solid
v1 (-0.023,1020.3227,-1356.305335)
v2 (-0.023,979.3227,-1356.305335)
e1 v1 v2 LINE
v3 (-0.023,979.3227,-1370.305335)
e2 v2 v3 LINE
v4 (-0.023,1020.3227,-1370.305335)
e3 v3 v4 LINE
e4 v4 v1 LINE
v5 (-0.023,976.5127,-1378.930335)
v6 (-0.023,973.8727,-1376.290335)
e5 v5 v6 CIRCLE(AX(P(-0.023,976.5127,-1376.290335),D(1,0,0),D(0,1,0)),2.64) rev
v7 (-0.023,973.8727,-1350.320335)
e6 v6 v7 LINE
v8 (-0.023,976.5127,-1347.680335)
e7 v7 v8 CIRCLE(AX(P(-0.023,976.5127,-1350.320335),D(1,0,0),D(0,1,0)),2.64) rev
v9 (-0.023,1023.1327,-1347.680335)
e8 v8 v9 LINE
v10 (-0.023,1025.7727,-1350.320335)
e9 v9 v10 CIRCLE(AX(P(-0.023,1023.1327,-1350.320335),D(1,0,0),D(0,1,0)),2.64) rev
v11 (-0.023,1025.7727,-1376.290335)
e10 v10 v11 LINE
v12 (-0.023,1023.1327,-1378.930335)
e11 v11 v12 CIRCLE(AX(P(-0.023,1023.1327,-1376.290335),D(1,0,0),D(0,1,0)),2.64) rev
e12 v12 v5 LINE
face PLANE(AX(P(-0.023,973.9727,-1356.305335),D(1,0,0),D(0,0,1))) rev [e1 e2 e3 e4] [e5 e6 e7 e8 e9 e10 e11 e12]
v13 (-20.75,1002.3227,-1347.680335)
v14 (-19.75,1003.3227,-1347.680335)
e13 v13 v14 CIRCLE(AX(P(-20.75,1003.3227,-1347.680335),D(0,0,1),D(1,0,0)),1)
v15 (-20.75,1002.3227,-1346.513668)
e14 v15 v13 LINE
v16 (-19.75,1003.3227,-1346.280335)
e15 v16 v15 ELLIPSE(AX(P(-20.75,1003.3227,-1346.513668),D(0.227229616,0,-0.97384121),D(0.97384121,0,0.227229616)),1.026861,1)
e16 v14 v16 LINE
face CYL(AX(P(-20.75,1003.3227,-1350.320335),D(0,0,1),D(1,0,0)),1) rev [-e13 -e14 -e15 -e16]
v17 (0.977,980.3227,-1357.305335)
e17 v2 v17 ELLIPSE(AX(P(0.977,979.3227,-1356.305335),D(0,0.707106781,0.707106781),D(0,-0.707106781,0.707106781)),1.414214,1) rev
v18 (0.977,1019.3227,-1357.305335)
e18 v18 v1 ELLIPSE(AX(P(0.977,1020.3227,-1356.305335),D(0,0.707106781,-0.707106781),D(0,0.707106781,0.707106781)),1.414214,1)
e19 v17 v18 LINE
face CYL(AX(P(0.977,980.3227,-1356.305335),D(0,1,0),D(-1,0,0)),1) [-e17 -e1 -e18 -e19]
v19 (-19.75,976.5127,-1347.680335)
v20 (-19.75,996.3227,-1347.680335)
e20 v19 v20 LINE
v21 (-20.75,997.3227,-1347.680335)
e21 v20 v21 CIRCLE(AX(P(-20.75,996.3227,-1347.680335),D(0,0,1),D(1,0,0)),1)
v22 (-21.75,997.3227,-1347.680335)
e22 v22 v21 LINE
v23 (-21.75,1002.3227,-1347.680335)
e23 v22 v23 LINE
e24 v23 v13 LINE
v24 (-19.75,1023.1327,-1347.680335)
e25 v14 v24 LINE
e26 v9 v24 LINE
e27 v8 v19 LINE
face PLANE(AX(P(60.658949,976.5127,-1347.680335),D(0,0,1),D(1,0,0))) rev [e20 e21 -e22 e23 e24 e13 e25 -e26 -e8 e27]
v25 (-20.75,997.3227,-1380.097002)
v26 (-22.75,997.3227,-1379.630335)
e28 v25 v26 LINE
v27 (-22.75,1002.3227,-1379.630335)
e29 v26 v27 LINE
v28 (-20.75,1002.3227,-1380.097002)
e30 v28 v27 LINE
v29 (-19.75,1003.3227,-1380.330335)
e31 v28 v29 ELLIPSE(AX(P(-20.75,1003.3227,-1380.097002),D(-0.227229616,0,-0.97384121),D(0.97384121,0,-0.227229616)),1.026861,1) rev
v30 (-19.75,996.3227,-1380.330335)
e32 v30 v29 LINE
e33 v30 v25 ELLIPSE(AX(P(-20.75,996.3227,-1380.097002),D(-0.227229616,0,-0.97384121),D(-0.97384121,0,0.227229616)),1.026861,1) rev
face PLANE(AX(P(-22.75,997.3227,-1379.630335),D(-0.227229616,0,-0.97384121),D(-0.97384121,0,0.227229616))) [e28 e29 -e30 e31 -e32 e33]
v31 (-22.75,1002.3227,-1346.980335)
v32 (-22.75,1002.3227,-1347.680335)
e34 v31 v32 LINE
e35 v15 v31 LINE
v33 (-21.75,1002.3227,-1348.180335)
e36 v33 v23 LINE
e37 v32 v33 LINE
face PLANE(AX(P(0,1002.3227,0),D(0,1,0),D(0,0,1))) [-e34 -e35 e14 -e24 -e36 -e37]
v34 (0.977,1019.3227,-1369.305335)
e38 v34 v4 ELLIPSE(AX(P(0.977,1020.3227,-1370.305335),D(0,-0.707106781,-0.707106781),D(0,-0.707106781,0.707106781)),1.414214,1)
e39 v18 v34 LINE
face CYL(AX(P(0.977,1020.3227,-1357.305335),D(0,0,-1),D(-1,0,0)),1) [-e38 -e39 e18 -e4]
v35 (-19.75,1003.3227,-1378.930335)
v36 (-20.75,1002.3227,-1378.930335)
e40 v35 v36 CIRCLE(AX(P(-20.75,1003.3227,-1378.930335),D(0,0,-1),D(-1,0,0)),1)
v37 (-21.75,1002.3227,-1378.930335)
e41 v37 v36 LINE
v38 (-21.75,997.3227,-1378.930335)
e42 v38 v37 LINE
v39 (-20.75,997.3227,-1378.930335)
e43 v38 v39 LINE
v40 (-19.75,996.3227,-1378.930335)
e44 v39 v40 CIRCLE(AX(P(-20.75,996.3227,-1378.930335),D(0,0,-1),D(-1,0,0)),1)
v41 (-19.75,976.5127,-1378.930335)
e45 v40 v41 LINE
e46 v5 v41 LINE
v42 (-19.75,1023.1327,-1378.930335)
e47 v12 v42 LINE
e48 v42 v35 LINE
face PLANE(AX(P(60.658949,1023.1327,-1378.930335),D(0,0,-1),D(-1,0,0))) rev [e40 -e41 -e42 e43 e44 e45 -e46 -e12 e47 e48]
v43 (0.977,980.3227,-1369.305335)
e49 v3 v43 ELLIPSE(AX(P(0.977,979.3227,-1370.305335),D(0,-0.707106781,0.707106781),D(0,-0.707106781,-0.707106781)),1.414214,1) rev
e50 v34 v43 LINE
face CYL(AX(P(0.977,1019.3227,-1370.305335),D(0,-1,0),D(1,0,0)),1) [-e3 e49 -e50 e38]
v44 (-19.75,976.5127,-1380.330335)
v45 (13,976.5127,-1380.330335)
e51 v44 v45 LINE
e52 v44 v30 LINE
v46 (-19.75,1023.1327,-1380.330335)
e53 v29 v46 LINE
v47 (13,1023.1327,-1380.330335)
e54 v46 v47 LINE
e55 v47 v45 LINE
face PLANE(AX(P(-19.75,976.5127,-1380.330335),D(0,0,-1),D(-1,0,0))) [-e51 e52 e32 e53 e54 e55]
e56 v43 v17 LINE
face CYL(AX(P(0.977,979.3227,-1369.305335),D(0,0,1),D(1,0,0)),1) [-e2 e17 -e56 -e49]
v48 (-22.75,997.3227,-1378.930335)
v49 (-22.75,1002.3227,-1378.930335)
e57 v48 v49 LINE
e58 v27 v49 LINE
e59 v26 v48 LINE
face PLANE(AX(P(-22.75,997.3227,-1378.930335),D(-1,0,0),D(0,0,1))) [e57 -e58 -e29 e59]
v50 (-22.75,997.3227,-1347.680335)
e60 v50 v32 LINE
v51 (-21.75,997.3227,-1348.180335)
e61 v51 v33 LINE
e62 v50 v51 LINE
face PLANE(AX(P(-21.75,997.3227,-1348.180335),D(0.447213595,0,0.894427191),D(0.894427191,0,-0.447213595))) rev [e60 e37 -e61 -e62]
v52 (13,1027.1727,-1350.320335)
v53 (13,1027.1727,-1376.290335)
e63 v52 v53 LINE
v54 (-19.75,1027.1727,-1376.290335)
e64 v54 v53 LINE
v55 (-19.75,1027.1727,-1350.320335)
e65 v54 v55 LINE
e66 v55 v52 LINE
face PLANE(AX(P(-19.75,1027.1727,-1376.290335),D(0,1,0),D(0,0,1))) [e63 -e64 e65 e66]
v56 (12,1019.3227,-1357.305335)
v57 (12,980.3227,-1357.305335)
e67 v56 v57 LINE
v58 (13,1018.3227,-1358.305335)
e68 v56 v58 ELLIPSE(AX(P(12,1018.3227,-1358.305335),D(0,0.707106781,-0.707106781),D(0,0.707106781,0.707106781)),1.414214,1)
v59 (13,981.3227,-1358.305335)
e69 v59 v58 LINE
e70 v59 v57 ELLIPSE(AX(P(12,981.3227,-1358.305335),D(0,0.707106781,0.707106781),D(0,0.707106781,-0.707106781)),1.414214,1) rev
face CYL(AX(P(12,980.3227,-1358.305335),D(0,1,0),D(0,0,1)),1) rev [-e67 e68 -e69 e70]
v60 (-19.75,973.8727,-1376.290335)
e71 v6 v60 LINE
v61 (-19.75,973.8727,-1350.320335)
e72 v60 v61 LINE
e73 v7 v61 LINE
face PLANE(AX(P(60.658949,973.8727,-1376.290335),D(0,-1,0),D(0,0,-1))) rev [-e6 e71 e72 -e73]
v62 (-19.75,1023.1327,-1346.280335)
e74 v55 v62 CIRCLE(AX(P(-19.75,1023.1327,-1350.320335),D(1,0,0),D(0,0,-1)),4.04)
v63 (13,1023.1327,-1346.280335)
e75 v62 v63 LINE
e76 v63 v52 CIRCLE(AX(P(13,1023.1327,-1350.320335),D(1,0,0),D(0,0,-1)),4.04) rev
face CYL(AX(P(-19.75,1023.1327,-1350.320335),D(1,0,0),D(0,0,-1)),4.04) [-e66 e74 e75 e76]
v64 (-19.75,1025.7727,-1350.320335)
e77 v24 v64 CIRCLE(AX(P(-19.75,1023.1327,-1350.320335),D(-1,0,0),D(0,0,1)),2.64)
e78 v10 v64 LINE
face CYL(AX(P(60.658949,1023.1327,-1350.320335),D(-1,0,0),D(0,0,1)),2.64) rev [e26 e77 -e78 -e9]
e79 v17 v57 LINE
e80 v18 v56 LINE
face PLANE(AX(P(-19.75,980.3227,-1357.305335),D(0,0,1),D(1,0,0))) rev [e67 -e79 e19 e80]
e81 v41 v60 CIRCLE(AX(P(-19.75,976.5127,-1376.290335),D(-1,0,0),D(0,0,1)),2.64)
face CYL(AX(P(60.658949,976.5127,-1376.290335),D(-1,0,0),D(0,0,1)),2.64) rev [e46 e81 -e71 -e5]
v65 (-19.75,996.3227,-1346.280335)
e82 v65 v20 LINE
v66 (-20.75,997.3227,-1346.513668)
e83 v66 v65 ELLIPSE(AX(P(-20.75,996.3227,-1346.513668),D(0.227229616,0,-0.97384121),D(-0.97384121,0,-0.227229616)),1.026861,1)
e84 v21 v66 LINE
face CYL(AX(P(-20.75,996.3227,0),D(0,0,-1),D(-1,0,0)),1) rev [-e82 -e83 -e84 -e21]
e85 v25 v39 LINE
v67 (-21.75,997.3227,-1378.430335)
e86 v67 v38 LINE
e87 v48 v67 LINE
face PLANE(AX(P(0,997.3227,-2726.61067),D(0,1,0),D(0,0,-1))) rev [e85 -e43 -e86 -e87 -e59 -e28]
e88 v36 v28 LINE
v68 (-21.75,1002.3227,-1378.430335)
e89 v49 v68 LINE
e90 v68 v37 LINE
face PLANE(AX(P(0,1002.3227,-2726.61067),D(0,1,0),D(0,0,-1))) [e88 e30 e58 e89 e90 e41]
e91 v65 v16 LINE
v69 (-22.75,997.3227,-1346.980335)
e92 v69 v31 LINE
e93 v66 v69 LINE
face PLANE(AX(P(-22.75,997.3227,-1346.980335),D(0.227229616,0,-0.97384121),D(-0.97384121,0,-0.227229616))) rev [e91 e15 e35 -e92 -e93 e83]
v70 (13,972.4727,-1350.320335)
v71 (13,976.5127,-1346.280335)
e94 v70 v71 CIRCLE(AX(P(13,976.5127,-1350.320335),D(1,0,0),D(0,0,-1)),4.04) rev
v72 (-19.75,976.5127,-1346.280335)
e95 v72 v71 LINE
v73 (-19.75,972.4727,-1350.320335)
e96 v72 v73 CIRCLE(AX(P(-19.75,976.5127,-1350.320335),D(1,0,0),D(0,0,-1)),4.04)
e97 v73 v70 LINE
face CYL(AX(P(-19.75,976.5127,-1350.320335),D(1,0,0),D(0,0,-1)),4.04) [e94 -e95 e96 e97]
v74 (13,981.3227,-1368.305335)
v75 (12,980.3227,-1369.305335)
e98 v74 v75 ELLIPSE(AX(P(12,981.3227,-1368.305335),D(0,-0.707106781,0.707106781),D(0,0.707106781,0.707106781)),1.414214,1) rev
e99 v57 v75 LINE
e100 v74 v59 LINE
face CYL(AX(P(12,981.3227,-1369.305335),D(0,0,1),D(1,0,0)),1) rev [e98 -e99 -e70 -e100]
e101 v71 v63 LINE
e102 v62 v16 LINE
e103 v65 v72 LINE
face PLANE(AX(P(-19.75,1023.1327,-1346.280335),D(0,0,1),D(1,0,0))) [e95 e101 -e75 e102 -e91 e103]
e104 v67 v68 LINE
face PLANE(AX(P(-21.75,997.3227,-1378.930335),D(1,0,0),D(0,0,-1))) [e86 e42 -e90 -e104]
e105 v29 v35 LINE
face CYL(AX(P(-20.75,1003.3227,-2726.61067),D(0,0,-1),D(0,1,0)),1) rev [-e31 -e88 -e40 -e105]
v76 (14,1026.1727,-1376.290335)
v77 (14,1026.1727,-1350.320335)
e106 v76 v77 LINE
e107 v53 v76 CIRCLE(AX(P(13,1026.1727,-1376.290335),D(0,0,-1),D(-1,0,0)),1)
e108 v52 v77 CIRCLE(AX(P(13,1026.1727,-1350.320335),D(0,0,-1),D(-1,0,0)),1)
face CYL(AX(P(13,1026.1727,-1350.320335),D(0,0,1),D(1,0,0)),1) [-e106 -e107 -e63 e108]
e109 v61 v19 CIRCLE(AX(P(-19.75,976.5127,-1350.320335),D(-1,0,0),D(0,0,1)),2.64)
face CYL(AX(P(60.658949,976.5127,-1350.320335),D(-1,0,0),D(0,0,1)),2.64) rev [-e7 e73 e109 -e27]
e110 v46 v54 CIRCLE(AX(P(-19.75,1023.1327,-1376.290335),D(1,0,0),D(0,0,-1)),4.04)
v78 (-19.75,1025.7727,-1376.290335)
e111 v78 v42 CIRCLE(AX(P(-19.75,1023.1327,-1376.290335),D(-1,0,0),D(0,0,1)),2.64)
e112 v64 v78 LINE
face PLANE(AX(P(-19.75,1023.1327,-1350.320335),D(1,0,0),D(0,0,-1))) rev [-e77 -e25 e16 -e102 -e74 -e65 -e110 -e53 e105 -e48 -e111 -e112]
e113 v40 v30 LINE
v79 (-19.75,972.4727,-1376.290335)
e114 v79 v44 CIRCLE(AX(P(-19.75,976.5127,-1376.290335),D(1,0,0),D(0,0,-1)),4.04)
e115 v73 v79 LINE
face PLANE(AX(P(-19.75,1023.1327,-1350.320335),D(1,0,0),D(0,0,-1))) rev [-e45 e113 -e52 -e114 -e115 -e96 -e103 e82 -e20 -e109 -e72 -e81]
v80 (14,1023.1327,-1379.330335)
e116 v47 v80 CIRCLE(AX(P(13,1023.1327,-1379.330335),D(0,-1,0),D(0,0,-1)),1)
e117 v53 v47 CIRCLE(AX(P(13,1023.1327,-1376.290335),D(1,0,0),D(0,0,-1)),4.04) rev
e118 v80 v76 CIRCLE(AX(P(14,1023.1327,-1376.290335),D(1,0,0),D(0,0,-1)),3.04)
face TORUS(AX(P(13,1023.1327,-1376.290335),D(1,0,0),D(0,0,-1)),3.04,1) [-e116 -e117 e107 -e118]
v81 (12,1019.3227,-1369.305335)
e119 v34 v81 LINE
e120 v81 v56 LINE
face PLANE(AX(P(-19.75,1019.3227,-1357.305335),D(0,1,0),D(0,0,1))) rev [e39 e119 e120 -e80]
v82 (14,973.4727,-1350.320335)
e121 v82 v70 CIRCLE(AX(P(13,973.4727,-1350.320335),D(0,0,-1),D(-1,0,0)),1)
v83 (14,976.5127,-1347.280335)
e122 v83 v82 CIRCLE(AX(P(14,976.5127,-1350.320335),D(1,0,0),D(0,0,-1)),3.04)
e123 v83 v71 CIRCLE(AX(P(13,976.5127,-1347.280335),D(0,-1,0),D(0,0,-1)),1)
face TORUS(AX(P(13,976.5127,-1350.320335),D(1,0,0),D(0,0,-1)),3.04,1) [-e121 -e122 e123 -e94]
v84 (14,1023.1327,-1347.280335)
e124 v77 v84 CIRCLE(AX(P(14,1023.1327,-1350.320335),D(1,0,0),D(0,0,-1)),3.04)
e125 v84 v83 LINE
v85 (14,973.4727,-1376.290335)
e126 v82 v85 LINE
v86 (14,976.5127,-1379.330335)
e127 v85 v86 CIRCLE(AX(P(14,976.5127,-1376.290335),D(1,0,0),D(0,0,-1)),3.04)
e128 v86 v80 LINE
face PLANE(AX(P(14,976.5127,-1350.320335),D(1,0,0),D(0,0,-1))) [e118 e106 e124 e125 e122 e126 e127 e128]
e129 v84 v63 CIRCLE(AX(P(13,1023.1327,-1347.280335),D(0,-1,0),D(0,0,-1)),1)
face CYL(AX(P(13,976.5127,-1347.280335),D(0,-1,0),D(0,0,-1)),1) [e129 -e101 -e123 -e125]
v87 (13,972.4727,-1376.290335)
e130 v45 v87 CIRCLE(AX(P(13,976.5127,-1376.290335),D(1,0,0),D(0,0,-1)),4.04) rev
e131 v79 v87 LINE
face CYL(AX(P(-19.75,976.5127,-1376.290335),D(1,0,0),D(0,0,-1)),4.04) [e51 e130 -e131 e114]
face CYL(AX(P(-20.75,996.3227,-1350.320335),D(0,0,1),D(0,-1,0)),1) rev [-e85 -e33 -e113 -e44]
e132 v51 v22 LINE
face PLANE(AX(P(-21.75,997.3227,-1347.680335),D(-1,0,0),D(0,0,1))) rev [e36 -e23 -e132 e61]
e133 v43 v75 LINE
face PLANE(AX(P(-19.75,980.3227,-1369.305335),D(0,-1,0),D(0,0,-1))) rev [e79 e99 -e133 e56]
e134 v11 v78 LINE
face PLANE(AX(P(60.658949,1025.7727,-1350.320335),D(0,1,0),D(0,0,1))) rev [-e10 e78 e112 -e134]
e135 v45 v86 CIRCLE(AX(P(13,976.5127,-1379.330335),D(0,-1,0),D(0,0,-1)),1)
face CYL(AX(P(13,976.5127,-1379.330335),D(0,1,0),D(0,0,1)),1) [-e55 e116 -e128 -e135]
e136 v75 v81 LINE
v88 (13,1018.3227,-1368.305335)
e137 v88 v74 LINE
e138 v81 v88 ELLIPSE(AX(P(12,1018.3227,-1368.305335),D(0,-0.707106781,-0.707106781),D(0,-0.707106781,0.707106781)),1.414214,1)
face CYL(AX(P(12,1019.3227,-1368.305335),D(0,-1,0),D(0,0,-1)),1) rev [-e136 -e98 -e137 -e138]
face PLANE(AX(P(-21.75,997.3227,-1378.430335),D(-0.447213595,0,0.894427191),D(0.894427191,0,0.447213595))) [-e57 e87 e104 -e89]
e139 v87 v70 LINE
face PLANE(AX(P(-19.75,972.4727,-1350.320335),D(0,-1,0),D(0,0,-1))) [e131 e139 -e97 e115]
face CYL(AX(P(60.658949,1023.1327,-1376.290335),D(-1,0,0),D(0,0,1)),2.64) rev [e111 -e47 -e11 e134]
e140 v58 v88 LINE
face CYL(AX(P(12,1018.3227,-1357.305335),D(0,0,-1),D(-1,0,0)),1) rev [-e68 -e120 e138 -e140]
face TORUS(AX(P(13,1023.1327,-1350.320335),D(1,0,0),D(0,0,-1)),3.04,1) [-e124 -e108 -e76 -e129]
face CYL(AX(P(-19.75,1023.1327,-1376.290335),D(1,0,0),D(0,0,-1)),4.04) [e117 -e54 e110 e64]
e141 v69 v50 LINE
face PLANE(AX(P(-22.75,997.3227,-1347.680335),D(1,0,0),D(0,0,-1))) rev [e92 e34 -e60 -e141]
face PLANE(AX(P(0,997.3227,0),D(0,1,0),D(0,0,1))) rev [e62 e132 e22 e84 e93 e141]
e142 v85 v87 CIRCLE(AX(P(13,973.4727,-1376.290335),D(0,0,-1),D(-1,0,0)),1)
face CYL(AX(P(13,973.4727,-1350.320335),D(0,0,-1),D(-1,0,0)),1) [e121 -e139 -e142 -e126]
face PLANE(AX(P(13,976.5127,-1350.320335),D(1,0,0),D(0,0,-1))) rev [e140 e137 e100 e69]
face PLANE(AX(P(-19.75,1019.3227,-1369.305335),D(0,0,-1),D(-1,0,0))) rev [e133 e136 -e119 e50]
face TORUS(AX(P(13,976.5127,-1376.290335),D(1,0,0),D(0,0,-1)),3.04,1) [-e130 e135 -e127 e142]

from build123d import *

# Parameters (mm, degrees)
BOSS_EXTRUDE2_DEPTH      = 13
BOSS_EXTRUDE2_DEPTH_BACK = 19.75
SKETCH2_W                = 39
SKETCH2_H                = 12
BOSS_EXTRUDE3_DEPTH      = 1
CUT_EXTRUDE1_DEPTH       = 19.727
CLIP_EDGE_DEPTH          = 2.5
FILLET1_R                = 1


with BuildPart() as part:
    # Sketch2 → Boss-Extrude2 (new, two sides: drawn at the far end of the back side and taken through both)
    with BuildSketch(Plane(origin=(0, 0, 0), x_dir=(0, -1, 0), z_dir=(1, 0, 0)).offset(-BOSS_EXTRUDE2_DEPTH_BACK)):
        with BuildLine():
            Line((-1027.172700071, 1376.290334899), (-1027.172700071, 1350.320334899))
            ThreePointArc((-1027.172700071, 1350.320334899), (-1025.989411467, 1347.463623503), (-1023.132700071, 1346.280334899))
            Line((-1023.132700071, 1346.280334899), (-976.512700071, 1346.280334899))
            ThreePointArc((-976.512700071, 1346.280334899), (-973.655988675, 1347.463623503), (-972.472700071, 1350.320334899))
            Line((-972.472700071, 1350.320334899), (-972.472700071, 1376.290334899))
            ThreePointArc((-972.472700071, 1376.290334899), (-973.655988675, 1379.147046295), (-976.512700071, 1380.330334899))
            Line((-976.512700071, 1380.330334899), (-1023.132700071, 1380.330334899))
            ThreePointArc((-1023.132700071, 1380.330334899), (-1025.989411467, 1379.147046295), (-1027.172700071, 1376.290334899))
        make_face()
        with Locations((-999.822700071, 1363.305334899)):
            Rectangle(SKETCH2_W, SKETCH2_H, mode=Mode.SUBTRACT)
    extrude(amount=BOSS_EXTRUDE2_DEPTH + BOSS_EXTRUDE2_DEPTH_BACK)

    # Sketch3 → Boss-Extrude3 (add)
    with BuildSketch(Plane.YZ.offset(13)):
        with BuildLine():
            Line((972.472700071, -1350.320334899), (972.472700071, -1376.290334899))
            ThreePointArc((972.472700071, -1376.290334899), (973.655988675, -1379.147046295), (976.512700071, -1380.330334899))
            Line((976.512700071, -1380.330334899), (1023.132700071, -1380.330334899))
            ThreePointArc((1023.132700071, -1380.330334899), (1025.989411467, -1379.147046295), (1027.172700071, -1376.290334899))
            Line((1027.172700071, -1376.290334899), (1027.172700071, -1350.320334899))
            ThreePointArc((1027.172700071, -1350.320334899), (1025.989411467, -1347.463623503), (1023.132700071, -1346.280334899))
            Line((1023.132700071, -1346.280334899), (976.512700071, -1346.280334899))
            ThreePointArc((976.512700071, -1346.280334899), (973.655988675, -1347.463623503), (972.472700071, -1350.320334899))
        make_face()
    extrude(amount=BOSS_EXTRUDE3_DEPTH)

    # Sketch6 → Cut-Extrude1 (cut)
    with BuildSketch(Plane(origin=(-19.75, 0, 0), x_dir=(0, -1, 0), z_dir=(-1, 0, 0))):
        with BuildLine():
            Line((-1025.772700071, -1350.320334899), (-1025.772700071, -1376.290334899))
            ThreePointArc((-1025.772700071, -1376.290334899), (-1024.999461974, -1378.157096801), (-1023.132700071, -1378.930334899))
            Line((-1023.132700071, -1378.930334899), (-976.512700071, -1378.930334899))
            ThreePointArc((-976.512700071, -1378.930334899), (-974.645938169, -1378.157096801), (-973.872700071, -1376.290334899))
            Line((-973.872700071, -1376.290334899), (-973.872700071, -1350.320334899))
            ThreePointArc((-973.872700071, -1350.320334899), (-974.645938169, -1348.453572996), (-976.512700071, -1347.680334899))
            Line((-976.512700071, -1347.680334899), (-1023.132700071, -1347.680334899))
            ThreePointArc((-1023.132700071, -1347.680334899), (-1024.999461974, -1348.453572996), (-1025.772700071, -1350.320334899))
        make_face()
    extrude(amount=-CUT_EXTRUDE1_DEPTH, mode=Mode.SUBTRACT)

    # Sketch10 → Clip Edge (add, symmetric)
    with BuildSketch(Plane(origin=(0, 999.822700071, 0), x_dir=(-1, 0, 0), z_dir=(0, -1, 0))):
        Polygon((19.75, 1346.280334899), (19.75, 1347.680334899), (21.75, 1347.680334899), (21.75, 1348.180334899), (22.75, 1347.680334899), (22.75, 1346.980334899), align=None)
    clip_edge = extrude(amount=CLIP_EDGE_DEPTH, both=True)

    # Mirror1: Clip Edge across plane
    add(clip_edge.mirror(Plane(origin=(0, 0, -1363.305334899), x_dir=(1, 0, 0), z_dir=(0, 0, -1))))

    # Fillet1
    # the kernel refuses this fillet: 1 mm, written as the material it adds along each edge
    with BuildSketch(Plane(origin=(-19.75, 1002.322700071, -1346.280334899), x_dir=(0, 1, 0), z_dir=(0, 0, -1))) as fillet1_piece_1_section:
        with BuildLine():
            CenterArc((FILLET1_R, -FILLET1_R), FILLET1_R, 90, 90)
            Line((0, -FILLET1_R), (0, 0))
            Line((0, 0), (FILLET1_R, 0))
        make_face()
    fillet1_piece_1 = extrude(amount=1.4, mode=Mode.PRIVATE)
    fillet1_piece_1 = split(fillet1_piece_1, bisect_by=Plane(origin=(-20.117660962, 1002.553814872, -1346.366122456), z_dir=(0.22722961560622243, 0, -0.973841209741839)), keep=Keep.TOP, mode=Mode.PRIVATE)
    add(fillet1_piece_1)
    with BuildSketch(Plane(origin=(-19.75, 997.322700071, -1346.280334899), x_dir=(0, -1, 0), z_dir=(0, 0, -1))) as fillet1_piece_2_section:
        with BuildLine():
            CenterArc((FILLET1_R, FILLET1_R), FILLET1_R, 180, 90)
            Line((0, FILLET1_R), (0, 0))
            Line((0, 0), (FILLET1_R, 0))
        make_face()
    fillet1_piece_2 = extrude(amount=1.4, mode=Mode.PRIVATE)
    fillet1_piece_2 = split(fillet1_piece_2, bisect_by=Plane(origin=(-20.117660962, 997.091585271, -1346.366122456), z_dir=(0.22722961560622243, 0, -0.973841209741839)), keep=Keep.TOP, mode=Mode.PRIVATE)
    add(fillet1_piece_2)
    with BuildSketch(Plane(origin=(-19.75, 997.322700071, -1380.330334899), x_dir=(0, -1, 0), z_dir=(0, 0, 1))) as fillet1_piece_3_section:
        with BuildLine():
            CenterArc((FILLET1_R, -FILLET1_R), FILLET1_R, 90, 90)
            Line((0, -FILLET1_R), (0, 0))
            Line((0, 0), (FILLET1_R, 0))
        make_face()
    fillet1_piece_3 = extrude(amount=1.4, mode=Mode.PRIVATE)
    fillet1_piece_3 = split(fillet1_piece_3, bisect_by=Plane(origin=(-20.117660962, 997.091585271, -1380.244547341), z_dir=(0.22722961560622243, 0, 0.973841209741839)), keep=Keep.TOP, mode=Mode.PRIVATE)
    add(fillet1_piece_3)
    with BuildSketch(Plane(origin=(-19.75, 1002.322700071, -1380.330334899), x_dir=(0, 1, 0), z_dir=(0, 0, 1))) as fillet1_piece_4_section:
        with BuildLine():
            CenterArc((FILLET1_R, FILLET1_R), FILLET1_R, 180, 90)
            Line((0, FILLET1_R), (0, 0))
            Line((0, 0), (FILLET1_R, 0))
        make_face()
    fillet1_piece_4 = extrude(amount=1.4, mode=Mode.PRIVATE)
    fillet1_piece_4 = split(fillet1_piece_4, bisect_by=Plane(origin=(-20.117660962, 1002.553814872, -1380.244547341), z_dir=(0.22722961560622243, 0, 0.973841209741839)), keep=Keep.TOP, mode=Mode.PRIVATE)
    add(fillet1_piece_4)
    with BuildSketch(Plane(origin=(13, 1021.822700071, -1369.305334899), x_dir=(-1, 0, 0), z_dir=(0, -1, 0)), Plane(origin=(13, 977.822700071, -1357.305334899), x_dir=(-1, 0, 0), z_dir=(0, 1, 0))) as fillet1_piece_5:
        with BuildLine():
            CenterArc((FILLET1_R, -FILLET1_R), FILLET1_R, 90, 90)
            Line((0, -FILLET1_R), (0, 0))
            Line((0, 0), (FILLET1_R, 0))
        make_face()
    extrude(amount=44)
    with BuildSketch(Plane(origin=(13, 1019.322700071, -1354.805334899), x_dir=(-1, 0, 0), z_dir=(0, 0, -1)), Plane(origin=(13, 980.322700071, -1371.805334899), x_dir=(-1, 0, 0), z_dir=(0, 0, 1))) as fillet1_piece_6:
        with BuildLine():
            CenterArc((FILLET1_R, -FILLET1_R), FILLET1_R, 90, 90)
            Line((0, -FILLET1_R), (0, 0))
            Line((0, 0), (FILLET1_R, 0))
        make_face()
    extrude(amount=17)
    # the kernel refuses this fillet: 1 mm, written as the material it takes off along each edge
    with BuildSketch(Plane(origin=(14, 976.512700071, -1350.320334899), x_dir=(0, 0, 1), z_dir=(0, 1, 0))) as fillet1_2_piece_1:
        with BuildLine():
            CenterArc((4.04 - FILLET1_R, -FILLET1_R), FILLET1_R, 0, 90)
            Line((4.04 - FILLET1_R, 0), (4.04, 0))
            Line((4.04, 0), (4.04, -FILLET1_R))
        make_face()
    revolve(axis=Axis((14, 976.512700071, -1350.320334899), (1, 0, 0)), revolution_arc=90, mode=Mode.SUBTRACT)
    with BuildSketch(Plane(origin=(14, 972.472700071, -1350.320334899), x_dir=(-1, 0, 0), z_dir=(0, 0, -1)), Plane(origin=(14, 1027.172700071, -1376.290334899), x_dir=(-1, 0, 0), z_dir=(0, 0, 1))) as fillet1_2_piece_2:
        with BuildLine():
            CenterArc((FILLET1_R, FILLET1_R), FILLET1_R, 180, 90)
            Line((0, FILLET1_R), (0, 0))
            Line((0, 0), (FILLET1_R, 0))
        make_face()
    extrude(amount=25.97, mode=Mode.SUBTRACT)
    with BuildSketch(Plane(origin=(14, 976.512700071, -1376.290334899), x_dir=(0, -1, 0), z_dir=(0, 0, 1))) as fillet1_2_piece_3:
        with BuildLine():
            CenterArc((4.04 - FILLET1_R, -FILLET1_R), FILLET1_R, 0, 90)
            Line((4.04 - FILLET1_R, 0), (4.04, 0))
            Line((4.04, 0), (4.04, -FILLET1_R))
        make_face()
    revolve(axis=Axis((14, 976.512700071, -1376.290334899), (1, 0, 0)), revolution_arc=90, mode=Mode.SUBTRACT)
    with BuildSketch(Plane(origin=(14, 976.512700071, -1380.330334899), x_dir=(-1, 0, 0), z_dir=(0, 1, 0)), Plane(origin=(14, 1023.132700071, -1346.280334899), x_dir=(-1, 0, 0), z_dir=(0, -1, 0))) as fillet1_2_piece_4:
        with BuildLine():
            CenterArc((FILLET1_R, FILLET1_R), FILLET1_R, 180, 90)
            Line((0, FILLET1_R), (0, 0))
            Line((0, 0), (FILLET1_R, 0))
        make_face()
    extrude(amount=46.62, mode=Mode.SUBTRACT)
    with BuildSketch(Plane(origin=(14, 1023.132700071, -1376.290334899), x_dir=(0, 0, -1), z_dir=(0, -1, 0))) as fillet1_2_piece_5:
        with BuildLine():
            CenterArc((4.04 - FILLET1_R, -FILLET1_R), FILLET1_R, 0, 90)
            Line((4.04, -FILLET1_R), (4.04, 0))
            Line((4.04, 0), (4.04 - FILLET1_R, 0))
        make_face()
    revolve(axis=Axis((14, 1023.132700071, -1376.290334899), (1, 0, 0)), revolution_arc=90, mode=Mode.SUBTRACT)
    with BuildSketch(Plane(origin=(14, 1023.132700071, -1350.320334899), x_dir=(0, 1, 0), z_dir=(0, 0, -1))) as fillet1_2_piece_6:
        with BuildLine():
            CenterArc((4.04 - FILLET1_R, -FILLET1_R), FILLET1_R, 0, 90)
            Line((4.04 - FILLET1_R, 0), (4.04, 0))
            Line((4.04, 0), (4.04, -FILLET1_R))
        make_face()
    revolve(axis=Axis((14, 1023.132700071, -1350.320334899), (1, 0, 0)), revolution_arc=90, mode=Mode.SUBTRACT)
    with BuildSketch(Plane(origin=(-0.023, 1019.322700071, -1369.305334899), x_dir=(0, 1, 0), z_dir=(0, 0, 1)), Plane(origin=(-0.023, 980.322700071, -1357.305334899), x_dir=(0, -1, 0), z_dir=(0, 0, -1))) as fillet1_2_piece_7:
        with BuildLine():
            CenterArc((FILLET1_R, -FILLET1_R), FILLET1_R, 90, 90)
            Line((0, -FILLET1_R), (0, 0))
            Line((0, 0), (FILLET1_R, 0))
        make_face()
    extrude(amount=12, mode=Mode.SUBTRACT)
    with BuildSketch(Plane(origin=(-0.023, 980.322700071, -1369.305334899), x_dir=(0, 0, -1), z_dir=(0, 1, 0)), Plane(origin=(-0.023, 1019.322700071, -1357.305334899), x_dir=(0, 0, 1), z_dir=(0, -1, 0))) as fillet1_2_piece_8:
        with BuildLine():
            CenterArc((FILLET1_R, -FILLET1_R), FILLET1_R, 90, 90)
            Line((0, -FILLET1_R), (0, 0))
            Line((0, 0), (FILLET1_R, 0))
        make_face()
    extrude(amount=39, mode=Mode.SUBTRACT)
    with BuildSketch(Plane(origin=(-0.023, 1019.322700071, -1371.805334899), x_dir=(0, 1, 0), z_dir=(0, 0, 1))) as fillet1_2_piece_9a_section:
        with BuildLine():
            CenterArc((FILLET1_R, -FILLET1_R), FILLET1_R, 90, 90)
            Line((0, -FILLET1_R), (0, 0))
            Line((0, 0), (FILLET1_R, 0))
        make_face()
    fillet1_2_piece_9a = extrude(amount=14.5, mode=Mode.PRIVATE)
    fillet1_2_piece_9a = split(fillet1_2_piece_9a, bisect_by=Plane(origin=(0.203395114, 1019.549095185, -1369.305334899), z_dir=(0, 0, -1)), keep=Keep.TOP, mode=Mode.PRIVATE)
    with BuildSketch(Plane(origin=(-0.023, 980.322700071, -1369.305334899), x_dir=(0, 0, -1), z_dir=(0, 1, 0))) as fillet1_2_piece_9b_section:
        with BuildLine():
            CenterArc((FILLET1_R, -FILLET1_R), FILLET1_R, 90, 90)
            Line((0, -FILLET1_R), (0, 0))
            Line((0, 0), (FILLET1_R, 0))
        make_face()
    fillet1_2_piece_9b = extrude(amount=41.5, mode=Mode.PRIVATE)
    fillet1_2_piece_9b = split(fillet1_2_piece_9b, bisect_by=Plane(origin=(0.203395114, 1019.322700071, -1369.531730013), z_dir=(0, 1, 0)), keep=Keep.TOP, mode=Mode.PRIVATE)
    fillet1_2_piece_9 = fillet1_2_piece_9a & fillet1_2_piece_9b
    add(fillet1_2_piece_9, mode=Mode.SUBTRACT)
    with BuildSketch(Plane(origin=(-0.023, 1021.822700071, -1357.305334899), x_dir=(0, 0, 1), z_dir=(0, -1, 0))) as fillet1_2_piece_10a_section:
        with BuildLine():
            CenterArc((FILLET1_R, -FILLET1_R), FILLET1_R, 90, 90)
            Line((0, -FILLET1_R), (0, 0))
            Line((0, 0), (FILLET1_R, 0))
        make_face()
    fillet1_2_piece_10a = extrude(amount=41.5, mode=Mode.PRIVATE)
    fillet1_2_piece_10a = split(fillet1_2_piece_10a, bisect_by=Plane(origin=(0.203395114, 1019.322700071, -1357.078939784), z_dir=(0, 1, 0)), keep=Keep.TOP, mode=Mode.PRIVATE)
    with BuildSketch(Plane(origin=(-0.023, 1019.322700071, -1369.305334899), x_dir=(0, 1, 0), z_dir=(0, 0, 1))) as fillet1_2_piece_10b_section:
        with BuildLine():
            CenterArc((FILLET1_R, -FILLET1_R), FILLET1_R, 90, 90)
            Line((0, -FILLET1_R), (0, 0))
            Line((0, 0), (FILLET1_R, 0))
        make_face()
    fillet1_2_piece_10b = extrude(amount=14.5, mode=Mode.PRIVATE)
    fillet1_2_piece_10b = split(fillet1_2_piece_10b, bisect_by=Plane(origin=(0.203395114, 1019.549095185, -1357.305334899), z_dir=(0, 0, 1)), keep=Keep.TOP, mode=Mode.PRIVATE)
    fillet1_2_piece_10 = fillet1_2_piece_10a & fillet1_2_piece_10b
    add(fillet1_2_piece_10, mode=Mode.SUBTRACT)
    with BuildSketch(Plane(origin=(-0.023, 980.322700071, -1357.305334899), x_dir=(0, -1, 0), z_dir=(0, 0, -1))) as fillet1_2_piece_11a_section:
        with BuildLine():
            CenterArc((FILLET1_R, -FILLET1_R), FILLET1_R, 90, 90)
            Line((0, -FILLET1_R), (0, 0))
            Line((0, 0), (FILLET1_R, 0))
        make_face()
    fillet1_2_piece_11a = extrude(amount=14.5, mode=Mode.PRIVATE)
    fillet1_2_piece_11a = split(fillet1_2_piece_11a, bisect_by=Plane(origin=(0.203395114, 980.096304957, -1369.305334899), z_dir=(0, 0, -1)), keep=Keep.TOP, mode=Mode.PRIVATE)
    with BuildSketch(Plane(origin=(-0.023, 977.822700071, -1369.305334899), x_dir=(0, 0, -1), z_dir=(0, 1, 0))) as fillet1_2_piece_11b_section:
        with BuildLine():
            CenterArc((FILLET1_R, -FILLET1_R), FILLET1_R, 90, 90)
            Line((0, -FILLET1_R), (0, 0))
            Line((0, 0), (FILLET1_R, 0))
        make_face()
    fillet1_2_piece_11b = extrude(amount=41.5, mode=Mode.PRIVATE)
    fillet1_2_piece_11b = split(fillet1_2_piece_11b, bisect_by=Plane(origin=(0.203395114, 980.322700071, -1369.531730013), z_dir=(0, -1, 0)), keep=Keep.TOP, mode=Mode.PRIVATE)
    fillet1_2_piece_11 = fillet1_2_piece_11a & fillet1_2_piece_11b
    add(fillet1_2_piece_11, mode=Mode.SUBTRACT)
    with BuildSketch(Plane(origin=(-0.023, 980.322700071, -1354.805334899), x_dir=(0, -1, 0), z_dir=(0, 0, -1))) as fillet1_2_piece_12a_section:
        with BuildLine():
            CenterArc((FILLET1_R, -FILLET1_R), FILLET1_R, 90, 90)
            Line((0, -FILLET1_R), (0, 0))
            Line((0, 0), (FILLET1_R, 0))
        make_face()
    fillet1_2_piece_12a = extrude(amount=14.5, mode=Mode.PRIVATE)
    fillet1_2_piece_12a = split(fillet1_2_piece_12a, bisect_by=Plane(origin=(0.203395114, 980.096304957, -1357.305334899), z_dir=(0, 0, 1)), keep=Keep.TOP, mode=Mode.PRIVATE)
    with BuildSketch(Plane(origin=(-0.023, 1019.322700071, -1357.305334899), x_dir=(0, 0, 1), z_dir=(0, -1, 0))) as fillet1_2_piece_12b_section:
        with BuildLine():
            CenterArc((FILLET1_R, -FILLET1_R), FILLET1_R, 90, 90)
            Line((0, -FILLET1_R), (0, 0))
            Line((0, 0), (FILLET1_R, 0))
        make_face()
    fillet1_2_piece_12b = extrude(amount=41.5, mode=Mode.PRIVATE)
    fillet1_2_piece_12b = split(fillet1_2_piece_12b, bisect_by=Plane(origin=(0.203395114, 980.322700071, -1357.078939784), z_dir=(0, -1, 0)), keep=Keep.TOP, mode=Mode.PRIVATE)
    fillet1_2_piece_12 = fillet1_2_piece_12a & fillet1_2_piece_12b
    add(fillet1_2_piece_12, mode=Mode.SUBTRACT)


solid = part.part
